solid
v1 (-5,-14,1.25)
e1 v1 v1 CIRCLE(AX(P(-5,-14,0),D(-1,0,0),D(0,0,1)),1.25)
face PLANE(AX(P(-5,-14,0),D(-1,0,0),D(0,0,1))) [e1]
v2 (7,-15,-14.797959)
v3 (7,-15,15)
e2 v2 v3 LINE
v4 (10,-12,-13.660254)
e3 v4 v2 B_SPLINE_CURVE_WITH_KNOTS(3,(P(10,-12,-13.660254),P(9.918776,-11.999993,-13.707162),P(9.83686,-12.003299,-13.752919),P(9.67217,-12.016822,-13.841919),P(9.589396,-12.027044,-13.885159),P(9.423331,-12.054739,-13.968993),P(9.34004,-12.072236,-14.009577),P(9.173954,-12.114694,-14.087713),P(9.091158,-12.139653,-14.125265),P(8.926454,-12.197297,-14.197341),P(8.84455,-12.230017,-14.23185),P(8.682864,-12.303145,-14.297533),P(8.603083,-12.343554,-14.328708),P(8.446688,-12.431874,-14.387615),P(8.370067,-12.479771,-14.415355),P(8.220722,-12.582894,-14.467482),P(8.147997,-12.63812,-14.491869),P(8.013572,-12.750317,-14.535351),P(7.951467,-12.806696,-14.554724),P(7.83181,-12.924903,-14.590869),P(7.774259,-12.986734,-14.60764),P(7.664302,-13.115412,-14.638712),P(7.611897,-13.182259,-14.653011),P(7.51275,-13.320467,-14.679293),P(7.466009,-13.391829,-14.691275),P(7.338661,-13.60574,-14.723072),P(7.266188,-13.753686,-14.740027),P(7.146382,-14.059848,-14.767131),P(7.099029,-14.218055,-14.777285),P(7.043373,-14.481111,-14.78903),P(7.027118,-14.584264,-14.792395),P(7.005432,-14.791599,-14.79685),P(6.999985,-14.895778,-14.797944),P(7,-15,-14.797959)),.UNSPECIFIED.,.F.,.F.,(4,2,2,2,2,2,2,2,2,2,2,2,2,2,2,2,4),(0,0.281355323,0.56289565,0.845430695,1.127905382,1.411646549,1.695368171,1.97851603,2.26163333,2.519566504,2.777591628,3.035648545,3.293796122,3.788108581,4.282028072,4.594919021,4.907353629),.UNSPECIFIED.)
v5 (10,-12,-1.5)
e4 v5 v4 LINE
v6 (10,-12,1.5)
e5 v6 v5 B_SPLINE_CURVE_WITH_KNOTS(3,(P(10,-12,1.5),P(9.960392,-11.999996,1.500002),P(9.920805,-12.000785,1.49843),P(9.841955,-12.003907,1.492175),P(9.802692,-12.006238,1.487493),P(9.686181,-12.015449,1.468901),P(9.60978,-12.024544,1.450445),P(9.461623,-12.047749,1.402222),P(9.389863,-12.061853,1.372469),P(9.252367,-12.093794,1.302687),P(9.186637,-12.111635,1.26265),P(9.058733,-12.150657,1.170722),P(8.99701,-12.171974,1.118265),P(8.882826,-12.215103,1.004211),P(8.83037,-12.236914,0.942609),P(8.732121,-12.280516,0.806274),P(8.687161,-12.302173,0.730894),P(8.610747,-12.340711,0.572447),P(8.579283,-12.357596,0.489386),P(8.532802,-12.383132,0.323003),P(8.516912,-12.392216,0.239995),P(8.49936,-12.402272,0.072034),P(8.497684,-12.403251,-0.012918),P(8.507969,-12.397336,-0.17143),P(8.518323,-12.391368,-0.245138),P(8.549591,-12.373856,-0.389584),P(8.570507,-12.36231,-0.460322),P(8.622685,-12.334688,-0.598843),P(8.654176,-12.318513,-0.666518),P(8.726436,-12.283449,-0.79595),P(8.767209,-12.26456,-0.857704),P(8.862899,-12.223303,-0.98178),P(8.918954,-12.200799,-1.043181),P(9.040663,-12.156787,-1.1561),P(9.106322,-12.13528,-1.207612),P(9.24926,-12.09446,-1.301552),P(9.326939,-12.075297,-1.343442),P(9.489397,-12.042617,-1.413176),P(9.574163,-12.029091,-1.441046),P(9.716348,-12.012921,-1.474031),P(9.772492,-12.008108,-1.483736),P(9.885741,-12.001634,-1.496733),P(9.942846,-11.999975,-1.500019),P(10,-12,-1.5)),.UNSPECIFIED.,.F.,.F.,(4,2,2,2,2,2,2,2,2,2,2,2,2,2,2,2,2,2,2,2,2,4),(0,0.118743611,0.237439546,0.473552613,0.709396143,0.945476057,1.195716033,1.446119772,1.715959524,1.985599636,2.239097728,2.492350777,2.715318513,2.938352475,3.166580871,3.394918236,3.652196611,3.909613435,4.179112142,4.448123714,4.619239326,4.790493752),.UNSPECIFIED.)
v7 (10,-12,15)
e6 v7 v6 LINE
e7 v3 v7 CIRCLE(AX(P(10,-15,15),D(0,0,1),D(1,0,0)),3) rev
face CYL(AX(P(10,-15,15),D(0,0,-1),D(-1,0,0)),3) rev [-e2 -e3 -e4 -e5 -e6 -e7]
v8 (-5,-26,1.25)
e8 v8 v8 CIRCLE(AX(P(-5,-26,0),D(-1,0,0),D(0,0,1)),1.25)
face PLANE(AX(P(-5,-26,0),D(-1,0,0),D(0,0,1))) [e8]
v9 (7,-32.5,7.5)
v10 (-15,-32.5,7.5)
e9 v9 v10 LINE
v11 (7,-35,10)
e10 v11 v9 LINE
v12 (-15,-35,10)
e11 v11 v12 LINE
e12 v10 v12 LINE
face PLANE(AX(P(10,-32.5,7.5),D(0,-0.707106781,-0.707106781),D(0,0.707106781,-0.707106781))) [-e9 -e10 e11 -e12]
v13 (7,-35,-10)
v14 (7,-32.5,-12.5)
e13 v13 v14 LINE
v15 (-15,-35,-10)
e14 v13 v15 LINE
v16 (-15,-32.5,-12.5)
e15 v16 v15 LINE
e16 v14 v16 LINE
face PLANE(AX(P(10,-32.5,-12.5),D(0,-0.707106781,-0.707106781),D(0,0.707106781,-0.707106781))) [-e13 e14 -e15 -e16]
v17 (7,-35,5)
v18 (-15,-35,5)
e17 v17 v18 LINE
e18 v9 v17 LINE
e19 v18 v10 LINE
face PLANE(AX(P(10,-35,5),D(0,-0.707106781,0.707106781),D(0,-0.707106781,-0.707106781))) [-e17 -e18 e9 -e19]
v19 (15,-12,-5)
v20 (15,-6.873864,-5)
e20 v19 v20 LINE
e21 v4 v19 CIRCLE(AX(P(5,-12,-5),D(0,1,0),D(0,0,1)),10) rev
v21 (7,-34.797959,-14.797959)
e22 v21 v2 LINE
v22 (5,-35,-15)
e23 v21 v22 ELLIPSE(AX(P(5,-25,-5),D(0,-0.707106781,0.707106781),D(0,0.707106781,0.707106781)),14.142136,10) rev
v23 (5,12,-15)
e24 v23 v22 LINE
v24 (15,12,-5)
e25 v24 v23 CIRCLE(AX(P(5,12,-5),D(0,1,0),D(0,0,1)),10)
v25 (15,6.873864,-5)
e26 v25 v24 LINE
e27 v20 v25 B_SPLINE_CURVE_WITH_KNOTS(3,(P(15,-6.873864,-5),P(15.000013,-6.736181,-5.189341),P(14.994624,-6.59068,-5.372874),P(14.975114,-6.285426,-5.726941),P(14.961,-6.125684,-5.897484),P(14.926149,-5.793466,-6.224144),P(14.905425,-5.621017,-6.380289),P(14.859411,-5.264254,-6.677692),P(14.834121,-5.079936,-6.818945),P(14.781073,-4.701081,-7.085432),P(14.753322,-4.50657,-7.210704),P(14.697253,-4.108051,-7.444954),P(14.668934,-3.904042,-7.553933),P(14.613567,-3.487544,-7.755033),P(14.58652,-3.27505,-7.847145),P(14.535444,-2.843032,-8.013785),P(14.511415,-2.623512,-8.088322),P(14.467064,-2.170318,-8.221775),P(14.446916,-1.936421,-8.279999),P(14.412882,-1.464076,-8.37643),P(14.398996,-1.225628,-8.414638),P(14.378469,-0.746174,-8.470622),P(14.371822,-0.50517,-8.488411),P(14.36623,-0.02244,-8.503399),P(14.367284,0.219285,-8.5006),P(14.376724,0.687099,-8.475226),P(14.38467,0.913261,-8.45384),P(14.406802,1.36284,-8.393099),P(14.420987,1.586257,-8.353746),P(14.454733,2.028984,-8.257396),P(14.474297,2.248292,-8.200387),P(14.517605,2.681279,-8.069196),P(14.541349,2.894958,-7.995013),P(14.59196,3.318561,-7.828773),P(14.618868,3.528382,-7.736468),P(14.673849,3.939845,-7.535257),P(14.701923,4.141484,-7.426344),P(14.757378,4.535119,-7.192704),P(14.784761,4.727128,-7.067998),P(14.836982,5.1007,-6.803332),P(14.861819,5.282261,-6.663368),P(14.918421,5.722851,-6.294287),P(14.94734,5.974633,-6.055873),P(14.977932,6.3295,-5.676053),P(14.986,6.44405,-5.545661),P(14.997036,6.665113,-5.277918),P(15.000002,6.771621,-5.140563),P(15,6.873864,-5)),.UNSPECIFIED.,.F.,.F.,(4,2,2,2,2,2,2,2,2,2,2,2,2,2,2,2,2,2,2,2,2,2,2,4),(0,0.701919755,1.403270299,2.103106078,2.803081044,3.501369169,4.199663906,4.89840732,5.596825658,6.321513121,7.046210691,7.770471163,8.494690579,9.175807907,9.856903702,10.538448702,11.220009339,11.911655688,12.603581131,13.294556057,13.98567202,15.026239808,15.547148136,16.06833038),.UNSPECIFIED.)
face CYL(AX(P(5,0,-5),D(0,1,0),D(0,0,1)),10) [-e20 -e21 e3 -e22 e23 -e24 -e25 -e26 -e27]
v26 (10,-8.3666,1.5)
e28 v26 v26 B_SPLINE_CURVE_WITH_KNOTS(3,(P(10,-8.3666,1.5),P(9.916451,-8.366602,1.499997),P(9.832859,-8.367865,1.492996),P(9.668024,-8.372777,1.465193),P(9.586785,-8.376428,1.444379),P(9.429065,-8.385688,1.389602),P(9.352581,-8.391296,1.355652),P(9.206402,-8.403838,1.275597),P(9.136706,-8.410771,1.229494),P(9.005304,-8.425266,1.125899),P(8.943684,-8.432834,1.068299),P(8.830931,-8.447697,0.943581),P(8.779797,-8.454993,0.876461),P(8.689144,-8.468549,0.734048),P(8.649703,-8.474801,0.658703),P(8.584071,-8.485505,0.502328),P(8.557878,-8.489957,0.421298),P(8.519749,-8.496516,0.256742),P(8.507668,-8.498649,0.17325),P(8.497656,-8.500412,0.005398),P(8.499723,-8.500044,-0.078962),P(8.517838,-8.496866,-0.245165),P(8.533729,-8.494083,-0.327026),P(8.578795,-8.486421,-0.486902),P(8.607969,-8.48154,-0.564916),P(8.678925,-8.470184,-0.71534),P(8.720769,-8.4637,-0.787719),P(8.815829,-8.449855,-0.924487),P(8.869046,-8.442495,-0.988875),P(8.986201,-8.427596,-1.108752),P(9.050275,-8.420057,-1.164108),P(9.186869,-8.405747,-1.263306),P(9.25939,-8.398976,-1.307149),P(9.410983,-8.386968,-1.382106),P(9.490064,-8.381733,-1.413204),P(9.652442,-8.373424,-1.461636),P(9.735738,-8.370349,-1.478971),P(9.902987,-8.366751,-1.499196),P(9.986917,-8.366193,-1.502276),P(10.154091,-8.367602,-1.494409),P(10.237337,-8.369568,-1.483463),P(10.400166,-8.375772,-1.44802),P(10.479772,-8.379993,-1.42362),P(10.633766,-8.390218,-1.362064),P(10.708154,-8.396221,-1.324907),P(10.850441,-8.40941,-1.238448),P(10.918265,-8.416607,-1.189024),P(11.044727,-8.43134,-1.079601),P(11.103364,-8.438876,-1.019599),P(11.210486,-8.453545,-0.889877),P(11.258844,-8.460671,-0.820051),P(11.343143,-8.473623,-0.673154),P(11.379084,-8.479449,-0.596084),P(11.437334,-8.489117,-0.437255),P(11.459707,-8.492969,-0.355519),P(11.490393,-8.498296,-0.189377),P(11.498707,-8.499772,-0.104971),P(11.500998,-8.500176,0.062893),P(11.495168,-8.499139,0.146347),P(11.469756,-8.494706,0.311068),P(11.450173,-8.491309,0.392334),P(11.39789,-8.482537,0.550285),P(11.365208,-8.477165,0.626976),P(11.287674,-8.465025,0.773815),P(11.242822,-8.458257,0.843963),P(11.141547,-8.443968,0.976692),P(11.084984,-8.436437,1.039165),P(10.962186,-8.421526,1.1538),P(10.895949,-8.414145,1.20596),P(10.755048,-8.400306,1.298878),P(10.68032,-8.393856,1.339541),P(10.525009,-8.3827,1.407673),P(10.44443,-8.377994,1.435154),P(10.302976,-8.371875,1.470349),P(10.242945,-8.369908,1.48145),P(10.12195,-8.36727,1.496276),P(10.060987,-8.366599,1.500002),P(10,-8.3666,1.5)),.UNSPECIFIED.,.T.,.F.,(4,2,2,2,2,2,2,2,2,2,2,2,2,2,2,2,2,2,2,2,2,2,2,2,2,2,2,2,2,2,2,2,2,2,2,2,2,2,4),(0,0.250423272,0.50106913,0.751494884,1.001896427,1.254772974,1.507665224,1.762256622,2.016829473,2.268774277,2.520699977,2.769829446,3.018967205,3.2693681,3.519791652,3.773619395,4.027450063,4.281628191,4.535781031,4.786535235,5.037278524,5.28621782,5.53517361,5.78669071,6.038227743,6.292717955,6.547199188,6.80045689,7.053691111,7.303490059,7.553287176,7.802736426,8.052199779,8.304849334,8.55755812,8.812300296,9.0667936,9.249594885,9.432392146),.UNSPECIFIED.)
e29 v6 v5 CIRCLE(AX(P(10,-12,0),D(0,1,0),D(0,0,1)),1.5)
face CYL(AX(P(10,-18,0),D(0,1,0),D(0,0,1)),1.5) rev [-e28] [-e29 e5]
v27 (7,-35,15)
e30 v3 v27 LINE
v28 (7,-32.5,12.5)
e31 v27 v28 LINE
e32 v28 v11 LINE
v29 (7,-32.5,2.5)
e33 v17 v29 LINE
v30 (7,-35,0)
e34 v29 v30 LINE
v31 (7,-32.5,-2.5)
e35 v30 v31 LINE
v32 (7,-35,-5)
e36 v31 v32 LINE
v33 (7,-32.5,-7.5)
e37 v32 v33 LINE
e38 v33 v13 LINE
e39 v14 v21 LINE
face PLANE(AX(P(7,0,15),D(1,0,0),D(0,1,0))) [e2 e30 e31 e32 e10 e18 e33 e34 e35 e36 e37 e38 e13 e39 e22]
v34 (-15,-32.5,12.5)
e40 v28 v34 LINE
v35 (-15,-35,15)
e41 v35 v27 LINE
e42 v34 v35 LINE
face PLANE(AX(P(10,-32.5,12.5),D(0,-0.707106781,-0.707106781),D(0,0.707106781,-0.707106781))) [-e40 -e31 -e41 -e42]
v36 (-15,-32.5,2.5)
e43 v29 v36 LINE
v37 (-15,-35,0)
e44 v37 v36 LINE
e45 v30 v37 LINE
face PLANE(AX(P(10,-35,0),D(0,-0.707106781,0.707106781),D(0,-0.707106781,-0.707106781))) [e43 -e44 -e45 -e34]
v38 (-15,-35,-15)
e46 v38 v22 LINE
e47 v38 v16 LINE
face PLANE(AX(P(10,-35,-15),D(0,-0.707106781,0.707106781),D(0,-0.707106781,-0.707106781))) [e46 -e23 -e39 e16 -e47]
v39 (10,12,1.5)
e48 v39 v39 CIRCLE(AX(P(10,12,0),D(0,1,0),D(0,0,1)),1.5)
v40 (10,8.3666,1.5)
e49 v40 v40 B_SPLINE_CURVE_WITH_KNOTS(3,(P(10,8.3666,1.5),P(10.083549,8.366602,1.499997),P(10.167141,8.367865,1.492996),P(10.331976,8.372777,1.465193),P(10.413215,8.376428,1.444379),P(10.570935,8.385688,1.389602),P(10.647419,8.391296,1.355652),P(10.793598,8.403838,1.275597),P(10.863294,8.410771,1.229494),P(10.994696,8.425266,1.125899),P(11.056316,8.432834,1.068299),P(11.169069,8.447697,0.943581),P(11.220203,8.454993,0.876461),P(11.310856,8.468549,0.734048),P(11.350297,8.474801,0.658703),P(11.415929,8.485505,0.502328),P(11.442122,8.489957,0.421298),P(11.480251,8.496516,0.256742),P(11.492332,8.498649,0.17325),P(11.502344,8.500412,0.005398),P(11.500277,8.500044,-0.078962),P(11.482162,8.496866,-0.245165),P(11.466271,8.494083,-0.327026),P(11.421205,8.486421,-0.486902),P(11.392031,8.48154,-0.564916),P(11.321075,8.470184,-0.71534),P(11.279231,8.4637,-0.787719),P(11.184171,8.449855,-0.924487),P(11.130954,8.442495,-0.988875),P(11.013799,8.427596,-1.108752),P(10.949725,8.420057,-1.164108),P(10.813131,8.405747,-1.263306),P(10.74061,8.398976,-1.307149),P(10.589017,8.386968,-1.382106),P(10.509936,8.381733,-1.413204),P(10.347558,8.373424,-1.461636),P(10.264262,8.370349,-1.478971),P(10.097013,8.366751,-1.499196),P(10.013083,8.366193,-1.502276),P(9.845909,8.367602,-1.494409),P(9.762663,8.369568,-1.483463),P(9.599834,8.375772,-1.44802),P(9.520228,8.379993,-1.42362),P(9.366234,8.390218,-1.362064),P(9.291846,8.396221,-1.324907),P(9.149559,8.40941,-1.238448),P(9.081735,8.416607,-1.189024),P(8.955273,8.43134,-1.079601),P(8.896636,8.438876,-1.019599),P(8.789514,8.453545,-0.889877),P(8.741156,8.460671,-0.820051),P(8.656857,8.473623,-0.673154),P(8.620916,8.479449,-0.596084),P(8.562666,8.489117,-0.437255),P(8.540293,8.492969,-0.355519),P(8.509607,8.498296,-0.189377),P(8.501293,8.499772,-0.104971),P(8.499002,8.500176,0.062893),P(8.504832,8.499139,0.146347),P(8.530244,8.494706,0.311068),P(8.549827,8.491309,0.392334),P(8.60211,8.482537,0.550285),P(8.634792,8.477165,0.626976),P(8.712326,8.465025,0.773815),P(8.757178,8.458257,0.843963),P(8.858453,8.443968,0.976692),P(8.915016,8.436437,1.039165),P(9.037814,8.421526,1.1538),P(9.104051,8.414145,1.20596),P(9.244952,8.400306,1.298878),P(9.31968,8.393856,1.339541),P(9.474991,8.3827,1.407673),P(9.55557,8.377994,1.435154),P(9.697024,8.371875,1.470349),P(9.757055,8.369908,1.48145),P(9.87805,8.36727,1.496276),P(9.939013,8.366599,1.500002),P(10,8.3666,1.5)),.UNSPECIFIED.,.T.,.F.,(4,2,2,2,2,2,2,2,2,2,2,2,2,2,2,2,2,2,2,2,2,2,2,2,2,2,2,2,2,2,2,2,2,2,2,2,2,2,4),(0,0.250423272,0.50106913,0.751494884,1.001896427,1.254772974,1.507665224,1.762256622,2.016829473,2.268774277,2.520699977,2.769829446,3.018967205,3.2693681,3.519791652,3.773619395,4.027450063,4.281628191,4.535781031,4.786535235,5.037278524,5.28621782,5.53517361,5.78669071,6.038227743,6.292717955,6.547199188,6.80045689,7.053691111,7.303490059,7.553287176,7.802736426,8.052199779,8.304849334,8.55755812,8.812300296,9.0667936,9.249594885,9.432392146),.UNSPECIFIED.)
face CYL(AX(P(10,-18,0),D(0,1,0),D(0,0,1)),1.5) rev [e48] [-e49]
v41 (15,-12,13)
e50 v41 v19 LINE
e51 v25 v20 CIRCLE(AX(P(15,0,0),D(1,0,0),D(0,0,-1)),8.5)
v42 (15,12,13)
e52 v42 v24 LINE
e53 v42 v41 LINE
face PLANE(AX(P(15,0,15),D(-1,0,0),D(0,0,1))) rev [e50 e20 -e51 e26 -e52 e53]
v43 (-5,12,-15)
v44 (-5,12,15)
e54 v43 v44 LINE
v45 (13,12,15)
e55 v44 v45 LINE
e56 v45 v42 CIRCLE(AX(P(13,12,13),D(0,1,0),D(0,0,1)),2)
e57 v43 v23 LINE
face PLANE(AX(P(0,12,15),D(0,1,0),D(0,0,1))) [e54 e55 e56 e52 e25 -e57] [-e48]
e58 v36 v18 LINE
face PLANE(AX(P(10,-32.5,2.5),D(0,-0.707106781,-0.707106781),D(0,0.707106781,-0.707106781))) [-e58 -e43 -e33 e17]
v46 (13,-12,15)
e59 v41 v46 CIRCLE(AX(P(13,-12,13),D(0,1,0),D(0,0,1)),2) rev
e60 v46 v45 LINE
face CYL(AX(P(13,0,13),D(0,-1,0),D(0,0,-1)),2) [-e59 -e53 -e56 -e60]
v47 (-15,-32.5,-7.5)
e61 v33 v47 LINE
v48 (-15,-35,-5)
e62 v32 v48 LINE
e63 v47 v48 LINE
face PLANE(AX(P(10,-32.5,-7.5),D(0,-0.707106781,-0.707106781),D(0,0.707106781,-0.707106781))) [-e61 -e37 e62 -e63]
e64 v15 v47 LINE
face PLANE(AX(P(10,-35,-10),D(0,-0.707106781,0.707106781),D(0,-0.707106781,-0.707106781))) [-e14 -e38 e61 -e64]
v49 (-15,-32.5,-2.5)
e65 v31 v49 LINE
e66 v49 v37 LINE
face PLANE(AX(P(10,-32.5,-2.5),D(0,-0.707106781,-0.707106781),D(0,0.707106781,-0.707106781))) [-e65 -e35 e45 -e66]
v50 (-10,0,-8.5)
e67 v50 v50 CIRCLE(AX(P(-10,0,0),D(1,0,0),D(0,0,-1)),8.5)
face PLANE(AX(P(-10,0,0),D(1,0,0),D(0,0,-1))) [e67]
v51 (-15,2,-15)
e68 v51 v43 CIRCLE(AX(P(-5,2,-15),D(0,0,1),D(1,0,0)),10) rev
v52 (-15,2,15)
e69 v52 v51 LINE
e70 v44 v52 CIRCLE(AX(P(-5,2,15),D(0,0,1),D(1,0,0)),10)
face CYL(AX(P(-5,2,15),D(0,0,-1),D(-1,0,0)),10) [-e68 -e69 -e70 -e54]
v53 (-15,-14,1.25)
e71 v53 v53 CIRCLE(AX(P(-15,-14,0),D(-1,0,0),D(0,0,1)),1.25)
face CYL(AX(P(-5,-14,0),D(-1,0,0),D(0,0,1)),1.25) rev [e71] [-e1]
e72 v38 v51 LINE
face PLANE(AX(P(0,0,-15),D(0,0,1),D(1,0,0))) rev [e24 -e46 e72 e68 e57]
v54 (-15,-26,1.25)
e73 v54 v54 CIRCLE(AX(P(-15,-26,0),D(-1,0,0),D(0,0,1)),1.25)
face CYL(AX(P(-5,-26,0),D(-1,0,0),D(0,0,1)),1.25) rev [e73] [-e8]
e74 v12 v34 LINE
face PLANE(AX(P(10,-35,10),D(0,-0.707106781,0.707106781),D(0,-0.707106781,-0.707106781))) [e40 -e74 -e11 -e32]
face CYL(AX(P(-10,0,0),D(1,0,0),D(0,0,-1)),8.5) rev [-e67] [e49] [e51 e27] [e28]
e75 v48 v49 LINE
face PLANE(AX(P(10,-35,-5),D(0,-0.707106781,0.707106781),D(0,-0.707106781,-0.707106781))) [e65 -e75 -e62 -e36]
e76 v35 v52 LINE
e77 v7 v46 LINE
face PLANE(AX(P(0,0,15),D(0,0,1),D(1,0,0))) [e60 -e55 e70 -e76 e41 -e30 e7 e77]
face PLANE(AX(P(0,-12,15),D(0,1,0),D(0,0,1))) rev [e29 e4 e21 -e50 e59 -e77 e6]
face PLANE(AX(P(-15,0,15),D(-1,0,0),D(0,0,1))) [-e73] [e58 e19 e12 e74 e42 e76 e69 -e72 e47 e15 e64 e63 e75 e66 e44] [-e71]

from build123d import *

# Parameters (mm, degrees)
CROQUIS1_W              = 30
CROQUIS1_H              = 24
CROQUIS1_W_2            = 22
CROQUIS1_H_2            = 23
SALIENTE_EXTRUIR1_DEPTH = 15
CROQUIS2_R              = 8.5
CORTAR_EXTRUIR1_DEPTH   = 25
REDONDEO1_R             = 10
REDONDEO2_R             = 10
CROQUIS5_R              = 1.5
CORTAR_EXTRUIR3_DEPTH   = 30
REDONDEO3_R             = 2
CORTAR_EXTRUIR4_DEPTH   = 25
CROQUIS7_R              = 1.25
CORTAR_EXTRUIR5_DEPTH   = 10
REDONDEO4_START         = 1.500000102
REDONDEO4_DEPTH         = 13.499999898
REDONDEO4_START_2       = -11.985627603
REDONDEO4_2_DEPTH       = 10.485627421
REDONDEO4_START_3       = -14.797959071
REDONDEO4_3_DEPTH       = 16.297959173
REDONDEO4_START_4       = -16
REDONDEO4_4_DEPTH       = 4


with BuildPart() as part:
    # Croquis1 → Saliente-Extruir1 (new, symmetric)
    with BuildSketch(Plane.XY):
        Rectangle(CROQUIS1_W, CROQUIS1_H)
        with Locations((-4, -23.5)):
            Rectangle(CROQUIS1_W_2, CROQUIS1_H_2)
    extrude(amount=SALIENTE_EXTRUIR1_DEPTH, both=True)

    # Croquis2 → Cortar-Extruir1 (cut)
    with BuildSketch(Plane(origin=(15, 0, 0), x_dir=(0, 0, -1), z_dir=(1, 0, 0))):
        Circle(CROQUIS2_R)
    extrude(amount=-CORTAR_EXTRUIR1_DEPTH, mode=Mode.SUBTRACT)

    # Redondeo1
    redondeo1_edges = [part.edges().sort_by_distance(p)[0] for p in [
        (-15, 12, 0),
    ]]
    fillet(redondeo1_edges, radius=REDONDEO1_R)

    # Redondeo2
    # the kernel refuses this fillet: 10 mm, written as the material it takes off along each edge
    with BuildSketch(Plane(origin=(15, -37, -15), x_dir=(0, 0, 1), z_dir=(0, 1, 0))) as redondeo2_piece_1:
        with BuildLine():
            CenterArc((REDONDEO2_R, -REDONDEO2_R), REDONDEO2_R, 90, 90)
            Line((0, -REDONDEO2_R), (0, 0))
            Line((0, 0), (REDONDEO2_R, 0))
        make_face()
    extrude(amount=74, mode=Mode.SUBTRACT)

    # Croquis5 → Cortar-Extruir3 (cut)
    with BuildSketch(Plane(origin=(0, 12, 0), x_dir=(1, 0, 0), z_dir=(0, 1, 0))):
        with Locations(Location((10, 0, 0), (0, 0, 270))):
            Circle(CROQUIS5_R)
    extrude(amount=-CORTAR_EXTRUIR3_DEPTH, mode=Mode.SUBTRACT)

    # Redondeo3
    redondeo3_edges = [part.edges().sort_by_distance(p)[0] for p in [
        (15, 0, 15),
    ]]
    fillet(redondeo3_edges, radius=REDONDEO3_R)

    # Croquis6 → Cortar-Extruir4 (cut)
    with BuildSketch(Plane.ZY.offset(15)):
        Polygon((12.5, -32.5), (10, -35), (15, -35), align=None)
        Polygon((7.5, -32.5), (5, -35), (10, -35), align=None)
        Polygon((2.5, -32.5), (0, -35), (5, -35), align=None)
        Polygon((-2.5, -32.5), (-5, -35), (0, -35), align=None)
        Polygon((-7.5, -32.5), (-10, -35), (-5, -35), align=None)
        Polygon((-12.5, -32.5), (-15, -35), (-10, -35), align=None)
    extrude(amount=-CORTAR_EXTRUIR4_DEPTH, mode=Mode.SUBTRACT)

    # Croquis7 → Cortar-Extruir5 (cut)
    with BuildSketch(Plane.ZY.offset(15)):
        with Locations((0, -14)):
            Circle(CROQUIS7_R)
        with Locations((0, -26)):
            Circle(CROQUIS7_R)
    extrude(amount=-CORTAR_EXTRUIR5_DEPTH, mode=Mode.SUBTRACT)

    # Redondeo4: read off the stored shape, not the designer's step
    # Redondeo4 outline → Redondeo4 (add)
    with BuildSketch(Plane.XY.offset(REDONDEO4_START)):
        with BuildLine():
            Line((7, -12), (7, -15))
            ThreePointArc((7, -15), (7.878679656, -12.878679656), (10, -12))
            Line((10, -12), (7, -12))
        make_face()
    extrude(amount=REDONDEO4_DEPTH)

    # Redondeo4 2 outline → Redondeo4 2 (add)
    with BuildSketch(Plane.XY.offset(REDONDEO4_START_2)):
        with BuildLine():
            Line((7, -12), (7, -15))
            ThreePointArc((7, -15), (7.878679656, -12.878679656), (10, -12))
            Line((10, -12), (7, -12))
        make_face()
    extrude(amount=REDONDEO4_2_DEPTH)

    # Redondeo4 3 outline → Redondeo4 3 (add)
    with BuildSketch(Plane.XY.offset(REDONDEO4_START_3)):
        with BuildLine():
            Line((7, -12), (7, -15))
            ThreePointArc((7, -15), (7.878679656, -12.878679656), (10, -12))
            Line((10, -12), (7, -12))
        make_face()
    extrude(amount=REDONDEO4_3_DEPTH)

    # Redondeo4 4 outline → Redondeo4 4 (cut)
    with BuildSketch(Plane(origin=(0, 0, 0), x_dir=(1, 0, 0), z_dir=(0, 1, 0)).offset(REDONDEO4_START_4)):
        with BuildLine():
            ThreePointArc((7, 14.797958971), (8.545926272, 14.350208921), (10, 13.660254038))
            Line((10, 13.660254038), (10, 14.797959071))
            Line((10, 14.797959071), (7, 14.797958971))
        make_face()
        with BuildLine():
            Line((10, -1.5), (10, 1.5))
            ThreePointArc((10, 1.5), (8.5, 0), (10, -1.5))
        make_face()
    extrude(amount=REDONDEO4_4_DEPTH, mode=Mode.SUBTRACT)


solid = part.part
